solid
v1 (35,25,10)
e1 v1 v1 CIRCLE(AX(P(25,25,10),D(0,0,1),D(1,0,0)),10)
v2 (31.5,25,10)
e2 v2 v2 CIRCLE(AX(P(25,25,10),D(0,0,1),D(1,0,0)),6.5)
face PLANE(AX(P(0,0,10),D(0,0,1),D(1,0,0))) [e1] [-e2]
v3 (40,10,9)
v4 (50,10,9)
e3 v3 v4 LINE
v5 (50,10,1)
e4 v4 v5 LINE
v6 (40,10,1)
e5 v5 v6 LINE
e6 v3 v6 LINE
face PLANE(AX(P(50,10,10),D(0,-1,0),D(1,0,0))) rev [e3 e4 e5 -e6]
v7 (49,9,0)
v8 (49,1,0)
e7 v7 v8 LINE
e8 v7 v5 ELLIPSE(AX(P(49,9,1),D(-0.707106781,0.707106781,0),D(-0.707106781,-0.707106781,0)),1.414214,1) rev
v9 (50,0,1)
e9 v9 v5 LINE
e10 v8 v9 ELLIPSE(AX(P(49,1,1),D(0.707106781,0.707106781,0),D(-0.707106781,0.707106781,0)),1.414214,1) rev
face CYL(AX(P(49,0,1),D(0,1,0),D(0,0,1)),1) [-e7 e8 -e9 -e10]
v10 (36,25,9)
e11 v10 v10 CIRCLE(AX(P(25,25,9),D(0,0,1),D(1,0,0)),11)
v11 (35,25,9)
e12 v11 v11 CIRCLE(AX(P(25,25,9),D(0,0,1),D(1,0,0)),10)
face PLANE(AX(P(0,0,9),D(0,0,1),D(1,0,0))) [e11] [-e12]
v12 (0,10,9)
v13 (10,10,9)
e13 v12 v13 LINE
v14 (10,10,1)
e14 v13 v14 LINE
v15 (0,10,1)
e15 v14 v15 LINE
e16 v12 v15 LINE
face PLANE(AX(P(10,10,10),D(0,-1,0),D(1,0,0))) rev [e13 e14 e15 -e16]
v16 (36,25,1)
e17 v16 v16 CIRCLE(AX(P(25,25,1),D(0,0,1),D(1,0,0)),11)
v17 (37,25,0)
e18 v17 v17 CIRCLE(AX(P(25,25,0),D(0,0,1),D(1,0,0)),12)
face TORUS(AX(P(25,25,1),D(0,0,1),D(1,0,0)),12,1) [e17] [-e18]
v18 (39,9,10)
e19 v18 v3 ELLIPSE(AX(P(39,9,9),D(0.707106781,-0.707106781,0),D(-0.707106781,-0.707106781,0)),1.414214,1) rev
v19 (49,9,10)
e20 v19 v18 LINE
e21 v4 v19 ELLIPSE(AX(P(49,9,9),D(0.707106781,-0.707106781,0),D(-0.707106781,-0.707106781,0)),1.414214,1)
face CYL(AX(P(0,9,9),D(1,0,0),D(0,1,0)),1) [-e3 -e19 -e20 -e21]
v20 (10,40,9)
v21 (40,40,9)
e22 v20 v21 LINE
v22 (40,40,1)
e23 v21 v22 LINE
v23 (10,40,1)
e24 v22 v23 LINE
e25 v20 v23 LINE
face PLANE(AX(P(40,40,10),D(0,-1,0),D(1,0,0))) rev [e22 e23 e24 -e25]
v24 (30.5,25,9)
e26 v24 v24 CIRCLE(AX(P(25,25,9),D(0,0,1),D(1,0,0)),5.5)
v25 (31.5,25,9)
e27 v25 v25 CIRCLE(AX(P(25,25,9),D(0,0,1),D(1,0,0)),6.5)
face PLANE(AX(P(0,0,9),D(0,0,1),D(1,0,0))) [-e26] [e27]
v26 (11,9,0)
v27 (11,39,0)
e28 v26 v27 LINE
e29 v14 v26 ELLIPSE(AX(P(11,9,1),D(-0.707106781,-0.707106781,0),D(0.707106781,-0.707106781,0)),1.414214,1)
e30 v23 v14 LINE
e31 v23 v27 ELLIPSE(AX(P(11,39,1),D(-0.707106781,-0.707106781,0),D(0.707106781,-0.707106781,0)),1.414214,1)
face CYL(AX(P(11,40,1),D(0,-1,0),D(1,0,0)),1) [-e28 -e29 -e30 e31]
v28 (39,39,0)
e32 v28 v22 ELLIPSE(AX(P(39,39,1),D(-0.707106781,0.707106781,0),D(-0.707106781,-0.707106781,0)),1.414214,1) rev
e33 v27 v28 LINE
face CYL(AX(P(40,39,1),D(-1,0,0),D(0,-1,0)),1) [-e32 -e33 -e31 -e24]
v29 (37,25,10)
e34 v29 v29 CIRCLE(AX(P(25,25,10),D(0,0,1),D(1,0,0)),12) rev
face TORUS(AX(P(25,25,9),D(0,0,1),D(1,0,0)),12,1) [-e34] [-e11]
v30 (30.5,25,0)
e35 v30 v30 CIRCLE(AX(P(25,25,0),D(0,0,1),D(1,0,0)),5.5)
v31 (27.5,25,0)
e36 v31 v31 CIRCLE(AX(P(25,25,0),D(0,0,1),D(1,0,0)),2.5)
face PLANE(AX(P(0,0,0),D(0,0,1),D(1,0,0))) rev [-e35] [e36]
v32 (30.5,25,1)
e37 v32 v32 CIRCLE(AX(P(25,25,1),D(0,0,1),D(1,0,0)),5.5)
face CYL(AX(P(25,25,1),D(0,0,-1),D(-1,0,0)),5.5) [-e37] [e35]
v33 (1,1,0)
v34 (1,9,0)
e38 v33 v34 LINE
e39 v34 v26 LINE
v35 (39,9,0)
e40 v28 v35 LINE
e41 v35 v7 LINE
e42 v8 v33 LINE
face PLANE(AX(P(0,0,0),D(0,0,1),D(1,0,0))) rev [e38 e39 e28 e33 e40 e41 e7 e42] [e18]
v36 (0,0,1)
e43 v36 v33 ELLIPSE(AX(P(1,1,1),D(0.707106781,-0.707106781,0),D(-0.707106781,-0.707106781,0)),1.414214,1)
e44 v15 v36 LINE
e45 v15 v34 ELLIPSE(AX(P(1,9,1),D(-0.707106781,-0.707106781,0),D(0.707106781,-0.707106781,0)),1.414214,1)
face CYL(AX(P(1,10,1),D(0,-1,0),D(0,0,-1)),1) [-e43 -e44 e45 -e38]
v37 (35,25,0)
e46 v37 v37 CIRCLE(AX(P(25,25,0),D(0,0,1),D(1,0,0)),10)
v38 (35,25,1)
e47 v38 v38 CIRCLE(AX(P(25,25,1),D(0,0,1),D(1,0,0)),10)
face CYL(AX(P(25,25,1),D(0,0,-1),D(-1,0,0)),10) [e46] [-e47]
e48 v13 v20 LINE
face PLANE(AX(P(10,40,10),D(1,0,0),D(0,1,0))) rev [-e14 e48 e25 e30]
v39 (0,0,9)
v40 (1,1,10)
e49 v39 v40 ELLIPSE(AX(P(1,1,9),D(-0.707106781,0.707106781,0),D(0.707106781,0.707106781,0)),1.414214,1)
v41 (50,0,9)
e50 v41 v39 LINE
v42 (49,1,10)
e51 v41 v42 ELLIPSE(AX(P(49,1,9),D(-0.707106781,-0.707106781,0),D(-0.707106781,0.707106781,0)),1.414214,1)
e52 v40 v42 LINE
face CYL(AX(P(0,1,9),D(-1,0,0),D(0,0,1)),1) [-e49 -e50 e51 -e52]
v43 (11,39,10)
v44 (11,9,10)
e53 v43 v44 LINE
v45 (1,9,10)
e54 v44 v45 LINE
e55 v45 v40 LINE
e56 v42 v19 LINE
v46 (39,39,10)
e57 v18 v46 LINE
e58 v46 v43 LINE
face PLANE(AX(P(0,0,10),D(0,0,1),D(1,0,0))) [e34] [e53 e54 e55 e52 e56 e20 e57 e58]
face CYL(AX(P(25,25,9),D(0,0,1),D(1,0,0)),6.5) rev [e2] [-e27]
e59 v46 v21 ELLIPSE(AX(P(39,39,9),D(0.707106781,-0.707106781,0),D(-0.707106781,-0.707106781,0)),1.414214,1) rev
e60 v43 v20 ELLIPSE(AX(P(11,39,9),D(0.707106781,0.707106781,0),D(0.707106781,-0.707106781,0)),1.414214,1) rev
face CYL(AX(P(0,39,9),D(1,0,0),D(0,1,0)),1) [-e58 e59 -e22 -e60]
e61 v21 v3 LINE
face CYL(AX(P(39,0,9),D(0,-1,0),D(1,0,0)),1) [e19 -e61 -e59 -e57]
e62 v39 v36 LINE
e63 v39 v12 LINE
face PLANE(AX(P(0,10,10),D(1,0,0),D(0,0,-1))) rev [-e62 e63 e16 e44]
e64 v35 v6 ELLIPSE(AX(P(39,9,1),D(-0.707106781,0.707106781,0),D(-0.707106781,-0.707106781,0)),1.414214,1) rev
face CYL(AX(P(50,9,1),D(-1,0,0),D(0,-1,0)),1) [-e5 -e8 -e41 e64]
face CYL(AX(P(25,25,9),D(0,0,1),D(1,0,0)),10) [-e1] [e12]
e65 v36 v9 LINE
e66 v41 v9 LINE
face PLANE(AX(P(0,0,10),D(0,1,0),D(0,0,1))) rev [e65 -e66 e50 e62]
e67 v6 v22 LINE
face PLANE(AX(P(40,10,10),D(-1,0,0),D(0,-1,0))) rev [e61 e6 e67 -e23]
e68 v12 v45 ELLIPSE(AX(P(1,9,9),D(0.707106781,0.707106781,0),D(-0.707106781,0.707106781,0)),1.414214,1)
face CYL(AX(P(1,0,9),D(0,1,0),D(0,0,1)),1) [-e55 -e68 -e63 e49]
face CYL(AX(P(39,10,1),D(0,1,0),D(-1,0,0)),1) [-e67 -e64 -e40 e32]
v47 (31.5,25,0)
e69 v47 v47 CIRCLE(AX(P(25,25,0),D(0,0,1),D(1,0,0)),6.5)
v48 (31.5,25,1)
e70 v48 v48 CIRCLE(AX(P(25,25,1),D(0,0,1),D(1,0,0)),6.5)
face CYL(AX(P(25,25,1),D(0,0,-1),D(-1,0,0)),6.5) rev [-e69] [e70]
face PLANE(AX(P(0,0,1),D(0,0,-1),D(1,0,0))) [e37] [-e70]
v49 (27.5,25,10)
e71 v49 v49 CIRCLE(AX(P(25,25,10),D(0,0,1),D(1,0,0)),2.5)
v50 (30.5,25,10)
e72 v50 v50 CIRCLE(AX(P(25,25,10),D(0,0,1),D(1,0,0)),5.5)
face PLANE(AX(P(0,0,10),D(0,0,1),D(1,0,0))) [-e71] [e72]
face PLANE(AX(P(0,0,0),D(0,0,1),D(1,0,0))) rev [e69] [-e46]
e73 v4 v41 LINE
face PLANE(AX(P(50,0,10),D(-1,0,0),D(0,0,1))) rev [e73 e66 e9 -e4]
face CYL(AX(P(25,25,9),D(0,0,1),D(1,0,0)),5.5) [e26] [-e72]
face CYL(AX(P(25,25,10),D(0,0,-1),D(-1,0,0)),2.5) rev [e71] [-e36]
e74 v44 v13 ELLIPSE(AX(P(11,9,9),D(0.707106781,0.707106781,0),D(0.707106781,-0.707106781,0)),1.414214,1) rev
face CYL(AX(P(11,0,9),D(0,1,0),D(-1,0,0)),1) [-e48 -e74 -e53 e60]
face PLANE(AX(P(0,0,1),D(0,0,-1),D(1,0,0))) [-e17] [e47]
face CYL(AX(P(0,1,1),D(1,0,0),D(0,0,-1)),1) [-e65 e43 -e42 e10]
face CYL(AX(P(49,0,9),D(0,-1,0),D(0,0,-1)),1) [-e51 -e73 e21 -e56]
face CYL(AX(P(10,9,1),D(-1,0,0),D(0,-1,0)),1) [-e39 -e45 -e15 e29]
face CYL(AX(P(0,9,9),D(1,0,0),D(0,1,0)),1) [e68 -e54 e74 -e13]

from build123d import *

# Parameters (mm, degrees)
SKETCH1_R           = 2.5
BOSS_EXTRUDE1_DEPTH = 10
SKETCH2_R           = 11
SKETCH2_R_2         = 10
SKETCH2_R_3         = 6.5
SKETCH2_R_4         = 5.5
CUT_EXTRUDE1_DEPTH  = 1
FILLET1_R           = 1


with BuildPart() as part:
    # Sketch1 → Boss-Extrude1 (new body)
    with BuildSketch(Plane.XY):
        Polygon((0, 0), (50, 0), (50, 10), (40, 10), (40, 40), (10, 40), (10, 10), (0, 10), align=None)
        with Locations((25, 25)):
            Circle(SKETCH1_R, mode=Mode.SUBTRACT)
    extrude(amount=BOSS_EXTRUDE1_DEPTH)

    # Sketch2 → Cut-Extrude1 (cut)
    # profile 1 of 2: a face of its own
    with BuildSketch(Plane.XY.offset(10)):
        with Locations((25, 25)):
            Circle(SKETCH2_R)
        with Locations((25, 25)):
            Circle(SKETCH2_R_2, mode=Mode.SUBTRACT)
    # profile 2 of 2: a face of its own
    with BuildSketch(Plane.XY.offset(10)):
        with Locations((25, 25)):
            Circle(SKETCH2_R_3)
        with Locations((25, 25)):
            Circle(SKETCH2_R_4, mode=Mode.SUBTRACT)
    cut_extrude1 = extrude(amount=-CUT_EXTRUDE1_DEPTH, mode=Mode.SUBTRACT)

    # Mirror1: Cut-Extrude1 across plane
    add(cut_extrude1.mirror(Plane.XY.offset(5)), mode=Mode.SUBTRACT)

    # Fillet1
    fillet1_edges = [part.edges().sort_by_distance(p)[0] for p in [
        (45, 10, 0),
        (50, 5, 0),
        (25, 0, 0),
        (0, 5, 0),
        (50, 5, 10),
        (45, 10, 10),
        (40, 25, 10),
        (25, 40, 10),
        (10, 25, 10),
        (14, 25, 10),
        (5, 10, 10),
        (14, 25, 0),
        (0, 5, 10),
        (5, 10, 0),
        (25, 0, 10),
        (10, 25, 0),
        (25, 40, 0),
        (40, 25, 0),
    ]]
    fillet(fillet1_edges, radius=FILLET1_R - 0.0001)  # a hair under: the kernel refuses the full size


solid = part.part
